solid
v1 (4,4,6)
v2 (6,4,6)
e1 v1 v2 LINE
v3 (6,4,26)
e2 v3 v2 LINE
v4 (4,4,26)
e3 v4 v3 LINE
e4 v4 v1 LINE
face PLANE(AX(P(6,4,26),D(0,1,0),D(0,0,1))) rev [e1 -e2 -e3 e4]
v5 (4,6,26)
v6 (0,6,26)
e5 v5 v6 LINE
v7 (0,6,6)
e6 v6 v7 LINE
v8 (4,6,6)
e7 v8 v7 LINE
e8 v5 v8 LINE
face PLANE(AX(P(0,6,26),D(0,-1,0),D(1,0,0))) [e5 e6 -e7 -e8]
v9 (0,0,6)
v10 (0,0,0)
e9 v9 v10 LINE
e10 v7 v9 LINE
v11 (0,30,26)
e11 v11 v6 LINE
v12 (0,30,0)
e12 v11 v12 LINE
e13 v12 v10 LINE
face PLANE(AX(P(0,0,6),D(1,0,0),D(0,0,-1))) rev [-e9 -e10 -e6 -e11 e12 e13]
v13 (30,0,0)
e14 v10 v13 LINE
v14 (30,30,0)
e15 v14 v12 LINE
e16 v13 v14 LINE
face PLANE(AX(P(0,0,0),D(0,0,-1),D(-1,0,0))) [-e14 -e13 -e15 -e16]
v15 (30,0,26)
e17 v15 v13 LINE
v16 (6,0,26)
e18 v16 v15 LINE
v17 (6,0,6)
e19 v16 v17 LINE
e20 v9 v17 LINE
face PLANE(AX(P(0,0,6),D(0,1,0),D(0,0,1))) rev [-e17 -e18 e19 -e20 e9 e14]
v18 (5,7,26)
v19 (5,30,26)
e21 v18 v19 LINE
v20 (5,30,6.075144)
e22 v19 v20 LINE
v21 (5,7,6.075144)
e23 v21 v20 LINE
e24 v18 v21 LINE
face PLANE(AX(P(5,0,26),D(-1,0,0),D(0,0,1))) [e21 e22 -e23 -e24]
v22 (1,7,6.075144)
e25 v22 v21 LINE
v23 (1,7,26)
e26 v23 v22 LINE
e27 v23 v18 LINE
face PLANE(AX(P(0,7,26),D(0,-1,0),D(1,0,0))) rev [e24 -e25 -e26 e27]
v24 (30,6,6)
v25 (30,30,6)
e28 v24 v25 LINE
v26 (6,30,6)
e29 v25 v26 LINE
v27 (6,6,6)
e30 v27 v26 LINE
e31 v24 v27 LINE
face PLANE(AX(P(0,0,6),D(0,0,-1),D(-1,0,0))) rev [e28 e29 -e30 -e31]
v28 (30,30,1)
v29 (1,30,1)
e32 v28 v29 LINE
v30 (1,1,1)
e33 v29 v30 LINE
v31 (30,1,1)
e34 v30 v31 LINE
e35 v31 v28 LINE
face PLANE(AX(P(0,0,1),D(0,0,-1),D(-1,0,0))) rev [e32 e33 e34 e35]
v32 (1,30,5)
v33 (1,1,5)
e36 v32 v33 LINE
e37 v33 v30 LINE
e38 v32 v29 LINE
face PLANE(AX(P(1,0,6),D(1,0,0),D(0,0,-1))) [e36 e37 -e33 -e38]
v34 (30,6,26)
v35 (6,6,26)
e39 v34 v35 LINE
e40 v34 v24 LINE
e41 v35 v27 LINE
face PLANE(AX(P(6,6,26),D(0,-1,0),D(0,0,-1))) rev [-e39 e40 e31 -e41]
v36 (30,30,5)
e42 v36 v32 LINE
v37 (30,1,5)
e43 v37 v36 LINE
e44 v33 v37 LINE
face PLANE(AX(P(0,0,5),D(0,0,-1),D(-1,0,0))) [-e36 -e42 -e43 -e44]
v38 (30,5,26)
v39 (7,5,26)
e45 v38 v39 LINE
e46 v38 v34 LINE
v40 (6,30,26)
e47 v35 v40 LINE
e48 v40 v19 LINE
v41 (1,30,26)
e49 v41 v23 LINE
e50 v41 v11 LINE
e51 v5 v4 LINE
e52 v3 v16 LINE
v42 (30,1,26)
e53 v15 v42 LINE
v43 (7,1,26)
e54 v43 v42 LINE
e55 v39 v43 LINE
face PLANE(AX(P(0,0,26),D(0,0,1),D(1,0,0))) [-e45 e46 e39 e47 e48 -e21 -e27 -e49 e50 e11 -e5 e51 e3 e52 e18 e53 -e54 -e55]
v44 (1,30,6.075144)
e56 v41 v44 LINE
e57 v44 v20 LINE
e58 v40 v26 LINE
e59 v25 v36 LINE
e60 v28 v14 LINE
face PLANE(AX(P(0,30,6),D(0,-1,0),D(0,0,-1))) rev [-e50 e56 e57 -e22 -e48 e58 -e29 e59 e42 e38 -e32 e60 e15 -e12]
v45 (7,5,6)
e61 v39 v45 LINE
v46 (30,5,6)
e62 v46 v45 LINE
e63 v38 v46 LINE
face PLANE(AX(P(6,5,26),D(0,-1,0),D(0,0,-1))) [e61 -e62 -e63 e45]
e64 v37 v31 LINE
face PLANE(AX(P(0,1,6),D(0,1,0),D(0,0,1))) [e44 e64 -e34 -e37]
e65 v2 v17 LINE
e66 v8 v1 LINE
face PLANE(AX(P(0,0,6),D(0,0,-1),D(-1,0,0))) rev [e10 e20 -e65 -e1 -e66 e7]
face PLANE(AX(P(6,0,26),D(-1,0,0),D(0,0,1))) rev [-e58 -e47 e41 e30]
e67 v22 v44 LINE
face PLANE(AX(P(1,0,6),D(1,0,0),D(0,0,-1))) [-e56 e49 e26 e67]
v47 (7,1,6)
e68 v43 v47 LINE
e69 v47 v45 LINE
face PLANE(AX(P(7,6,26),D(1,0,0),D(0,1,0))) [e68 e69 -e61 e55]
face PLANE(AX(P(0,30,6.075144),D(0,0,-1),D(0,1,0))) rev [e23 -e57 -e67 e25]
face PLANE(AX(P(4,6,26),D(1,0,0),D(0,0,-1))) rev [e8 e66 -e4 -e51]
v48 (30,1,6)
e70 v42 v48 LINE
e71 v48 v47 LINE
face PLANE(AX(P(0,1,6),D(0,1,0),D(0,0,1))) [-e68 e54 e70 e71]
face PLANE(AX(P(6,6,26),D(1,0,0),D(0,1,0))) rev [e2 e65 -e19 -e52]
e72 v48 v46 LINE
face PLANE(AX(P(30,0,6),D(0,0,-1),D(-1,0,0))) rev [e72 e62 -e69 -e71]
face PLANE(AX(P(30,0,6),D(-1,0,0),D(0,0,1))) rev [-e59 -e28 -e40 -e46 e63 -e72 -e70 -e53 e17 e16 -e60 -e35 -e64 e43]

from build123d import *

# Parameters (mm, degrees)
SKETCH1_W           = 30
SKETCH1_H           = 30
BOSS_EXTRUDE1_DEPTH = 6
BOSS_EXTRUDE4_DEPTH = 20
SKETCH4_W           = 2
SKETCH4_H           = 2
BOSS_EXTRUDE6_DEPTH = 20
SKETCH5_W           = 24
SKETCH5_H           = 6
BOSS_EXTRUDE7_DEPTH = 20
SHELL2_START        = 7
SHELL2_DEPTH        = 23
SHELL2_START_2      = 1
SHELL2_2_DEPTH      = 4
SHELL2_START_3      = 5
SHELL2_3_OUTLINE_W  = 29
SHELL2_3_OUTLINE_H  = 4
SHELL2_3_DEPTH      = 2
SKETCH7_W           = 23
SKETCH7_H           = 1
BOSS_EXTRUDE8_DEPTH = 5
SKETCH9_W           = 1.075143629
SKETCH9_H           = 23
BOSS_EXTRUDE9_DEPTH = 5
SKETCH10_W          = 4
SKETCH10_H          = 23
CUT_EXTRUDE1_DEPTH  = 10
SKETCH11_W          = 23
SKETCH11_H          = 4
CUT_EXTRUDE2_DEPTH  = 10


# Read off the part's stored shape, not the designer's step: Shell2
with BuildPart() as part:
    # Sketch1 → Boss-Extrude1 (new body)
    with BuildSketch(Plane.XY):
        with Locations((15, 15)):
            Rectangle(SKETCH1_W, SKETCH1_H)
    extrude(amount=BOSS_EXTRUDE1_DEPTH)

    # Sketch2 → Boss-Extrude4 (add)
    with BuildSketch(Plane.XY.offset(6)):
        Polygon((5, 6), (6, 6), (6, 30), (0, 30), (0, 6), align=None)
    extrude(amount=BOSS_EXTRUDE4_DEPTH)

    # Sketch4 → Boss-Extrude6 (add)
    with BuildSketch(Plane.XY.offset(6)):
        with Locations((5, 5)):
            Rectangle(SKETCH4_W, SKETCH4_H)
    extrude(amount=BOSS_EXTRUDE6_DEPTH)

    # Sketch5 → Boss-Extrude7 (add)
    with BuildSketch(Plane.XY.offset(6)):
        with Locations((18, 3)):
            Rectangle(SKETCH5_W, SKETCH5_H)
    extrude(amount=BOSS_EXTRUDE7_DEPTH)

    # Shell2 outline → Shell2 (cut)
    with BuildSketch(Plane(origin=(0, 0, 0), x_dir=(1, 0, 0), z_dir=(0, 1, 0)).offset(SHELL2_START)):
        Polygon((5, -5), (30, -5), (30, -1), (1, -1), (1, -25), (5, -25), align=None)
    extrude(amount=SHELL2_DEPTH, mode=Mode.SUBTRACT)

    # Shell2 2 outline → Shell2 2 (cut)
    with BuildSketch(Plane(origin=(0, 0, 0), x_dir=(1, 0, 0), z_dir=(0, 1, 0)).offset(SHELL2_START_2)):
        Polygon((7, -5), (7, -25), (30, -25), (30, -1), (1, -1), (1, -5), align=None)
    extrude(amount=SHELL2_2_DEPTH, mode=Mode.SUBTRACT)

    # Shell2 3 outline → Shell2 3 (cut)
    with BuildSketch(Plane(origin=(0, 0, 0), x_dir=(1, 0, 0), z_dir=(0, 1, 0)).offset(SHELL2_START_3)):
        with Locations((15.5, -3)):
            Rectangle(SHELL2_3_OUTLINE_W, SHELL2_3_OUTLINE_H)
    extrude(amount=SHELL2_3_DEPTH, mode=Mode.SUBTRACT)

    # Sketch7 → Boss-Extrude8 (add)
    with BuildSketch(Plane.XZ.offset(-5)):
        with Locations((18.5, 5.5)):
            Rectangle(SKETCH7_W, SKETCH7_H)
    extrude(amount=BOSS_EXTRUDE8_DEPTH)

    # Sketch9 → Boss-Extrude9 (add)
    with BuildSketch(Plane.ZY.offset(-5)):
        with Locations((5.537571814, 18.5)):
            Rectangle(SKETCH9_W, SKETCH9_H)
    extrude(amount=BOSS_EXTRUDE9_DEPTH)

    # Sketch10 → Cut-Extrude1 (cut)
    with BuildSketch(Plane.XY.offset(26)):
        with Locations((3, 18.5)):
            Rectangle(SKETCH10_W, SKETCH10_H)
    extrude(amount=-CUT_EXTRUDE1_DEPTH, mode=Mode.SUBTRACT)

    # Sketch11 → Cut-Extrude2 (cut)
    with BuildSketch(Plane.XY.offset(26)):
        with Locations((18.5, 3)):
            Rectangle(SKETCH11_W, SKETCH11_H)
    extrude(amount=-CUT_EXTRUDE2_DEPTH, mode=Mode.SUBTRACT)


solid = part.part
